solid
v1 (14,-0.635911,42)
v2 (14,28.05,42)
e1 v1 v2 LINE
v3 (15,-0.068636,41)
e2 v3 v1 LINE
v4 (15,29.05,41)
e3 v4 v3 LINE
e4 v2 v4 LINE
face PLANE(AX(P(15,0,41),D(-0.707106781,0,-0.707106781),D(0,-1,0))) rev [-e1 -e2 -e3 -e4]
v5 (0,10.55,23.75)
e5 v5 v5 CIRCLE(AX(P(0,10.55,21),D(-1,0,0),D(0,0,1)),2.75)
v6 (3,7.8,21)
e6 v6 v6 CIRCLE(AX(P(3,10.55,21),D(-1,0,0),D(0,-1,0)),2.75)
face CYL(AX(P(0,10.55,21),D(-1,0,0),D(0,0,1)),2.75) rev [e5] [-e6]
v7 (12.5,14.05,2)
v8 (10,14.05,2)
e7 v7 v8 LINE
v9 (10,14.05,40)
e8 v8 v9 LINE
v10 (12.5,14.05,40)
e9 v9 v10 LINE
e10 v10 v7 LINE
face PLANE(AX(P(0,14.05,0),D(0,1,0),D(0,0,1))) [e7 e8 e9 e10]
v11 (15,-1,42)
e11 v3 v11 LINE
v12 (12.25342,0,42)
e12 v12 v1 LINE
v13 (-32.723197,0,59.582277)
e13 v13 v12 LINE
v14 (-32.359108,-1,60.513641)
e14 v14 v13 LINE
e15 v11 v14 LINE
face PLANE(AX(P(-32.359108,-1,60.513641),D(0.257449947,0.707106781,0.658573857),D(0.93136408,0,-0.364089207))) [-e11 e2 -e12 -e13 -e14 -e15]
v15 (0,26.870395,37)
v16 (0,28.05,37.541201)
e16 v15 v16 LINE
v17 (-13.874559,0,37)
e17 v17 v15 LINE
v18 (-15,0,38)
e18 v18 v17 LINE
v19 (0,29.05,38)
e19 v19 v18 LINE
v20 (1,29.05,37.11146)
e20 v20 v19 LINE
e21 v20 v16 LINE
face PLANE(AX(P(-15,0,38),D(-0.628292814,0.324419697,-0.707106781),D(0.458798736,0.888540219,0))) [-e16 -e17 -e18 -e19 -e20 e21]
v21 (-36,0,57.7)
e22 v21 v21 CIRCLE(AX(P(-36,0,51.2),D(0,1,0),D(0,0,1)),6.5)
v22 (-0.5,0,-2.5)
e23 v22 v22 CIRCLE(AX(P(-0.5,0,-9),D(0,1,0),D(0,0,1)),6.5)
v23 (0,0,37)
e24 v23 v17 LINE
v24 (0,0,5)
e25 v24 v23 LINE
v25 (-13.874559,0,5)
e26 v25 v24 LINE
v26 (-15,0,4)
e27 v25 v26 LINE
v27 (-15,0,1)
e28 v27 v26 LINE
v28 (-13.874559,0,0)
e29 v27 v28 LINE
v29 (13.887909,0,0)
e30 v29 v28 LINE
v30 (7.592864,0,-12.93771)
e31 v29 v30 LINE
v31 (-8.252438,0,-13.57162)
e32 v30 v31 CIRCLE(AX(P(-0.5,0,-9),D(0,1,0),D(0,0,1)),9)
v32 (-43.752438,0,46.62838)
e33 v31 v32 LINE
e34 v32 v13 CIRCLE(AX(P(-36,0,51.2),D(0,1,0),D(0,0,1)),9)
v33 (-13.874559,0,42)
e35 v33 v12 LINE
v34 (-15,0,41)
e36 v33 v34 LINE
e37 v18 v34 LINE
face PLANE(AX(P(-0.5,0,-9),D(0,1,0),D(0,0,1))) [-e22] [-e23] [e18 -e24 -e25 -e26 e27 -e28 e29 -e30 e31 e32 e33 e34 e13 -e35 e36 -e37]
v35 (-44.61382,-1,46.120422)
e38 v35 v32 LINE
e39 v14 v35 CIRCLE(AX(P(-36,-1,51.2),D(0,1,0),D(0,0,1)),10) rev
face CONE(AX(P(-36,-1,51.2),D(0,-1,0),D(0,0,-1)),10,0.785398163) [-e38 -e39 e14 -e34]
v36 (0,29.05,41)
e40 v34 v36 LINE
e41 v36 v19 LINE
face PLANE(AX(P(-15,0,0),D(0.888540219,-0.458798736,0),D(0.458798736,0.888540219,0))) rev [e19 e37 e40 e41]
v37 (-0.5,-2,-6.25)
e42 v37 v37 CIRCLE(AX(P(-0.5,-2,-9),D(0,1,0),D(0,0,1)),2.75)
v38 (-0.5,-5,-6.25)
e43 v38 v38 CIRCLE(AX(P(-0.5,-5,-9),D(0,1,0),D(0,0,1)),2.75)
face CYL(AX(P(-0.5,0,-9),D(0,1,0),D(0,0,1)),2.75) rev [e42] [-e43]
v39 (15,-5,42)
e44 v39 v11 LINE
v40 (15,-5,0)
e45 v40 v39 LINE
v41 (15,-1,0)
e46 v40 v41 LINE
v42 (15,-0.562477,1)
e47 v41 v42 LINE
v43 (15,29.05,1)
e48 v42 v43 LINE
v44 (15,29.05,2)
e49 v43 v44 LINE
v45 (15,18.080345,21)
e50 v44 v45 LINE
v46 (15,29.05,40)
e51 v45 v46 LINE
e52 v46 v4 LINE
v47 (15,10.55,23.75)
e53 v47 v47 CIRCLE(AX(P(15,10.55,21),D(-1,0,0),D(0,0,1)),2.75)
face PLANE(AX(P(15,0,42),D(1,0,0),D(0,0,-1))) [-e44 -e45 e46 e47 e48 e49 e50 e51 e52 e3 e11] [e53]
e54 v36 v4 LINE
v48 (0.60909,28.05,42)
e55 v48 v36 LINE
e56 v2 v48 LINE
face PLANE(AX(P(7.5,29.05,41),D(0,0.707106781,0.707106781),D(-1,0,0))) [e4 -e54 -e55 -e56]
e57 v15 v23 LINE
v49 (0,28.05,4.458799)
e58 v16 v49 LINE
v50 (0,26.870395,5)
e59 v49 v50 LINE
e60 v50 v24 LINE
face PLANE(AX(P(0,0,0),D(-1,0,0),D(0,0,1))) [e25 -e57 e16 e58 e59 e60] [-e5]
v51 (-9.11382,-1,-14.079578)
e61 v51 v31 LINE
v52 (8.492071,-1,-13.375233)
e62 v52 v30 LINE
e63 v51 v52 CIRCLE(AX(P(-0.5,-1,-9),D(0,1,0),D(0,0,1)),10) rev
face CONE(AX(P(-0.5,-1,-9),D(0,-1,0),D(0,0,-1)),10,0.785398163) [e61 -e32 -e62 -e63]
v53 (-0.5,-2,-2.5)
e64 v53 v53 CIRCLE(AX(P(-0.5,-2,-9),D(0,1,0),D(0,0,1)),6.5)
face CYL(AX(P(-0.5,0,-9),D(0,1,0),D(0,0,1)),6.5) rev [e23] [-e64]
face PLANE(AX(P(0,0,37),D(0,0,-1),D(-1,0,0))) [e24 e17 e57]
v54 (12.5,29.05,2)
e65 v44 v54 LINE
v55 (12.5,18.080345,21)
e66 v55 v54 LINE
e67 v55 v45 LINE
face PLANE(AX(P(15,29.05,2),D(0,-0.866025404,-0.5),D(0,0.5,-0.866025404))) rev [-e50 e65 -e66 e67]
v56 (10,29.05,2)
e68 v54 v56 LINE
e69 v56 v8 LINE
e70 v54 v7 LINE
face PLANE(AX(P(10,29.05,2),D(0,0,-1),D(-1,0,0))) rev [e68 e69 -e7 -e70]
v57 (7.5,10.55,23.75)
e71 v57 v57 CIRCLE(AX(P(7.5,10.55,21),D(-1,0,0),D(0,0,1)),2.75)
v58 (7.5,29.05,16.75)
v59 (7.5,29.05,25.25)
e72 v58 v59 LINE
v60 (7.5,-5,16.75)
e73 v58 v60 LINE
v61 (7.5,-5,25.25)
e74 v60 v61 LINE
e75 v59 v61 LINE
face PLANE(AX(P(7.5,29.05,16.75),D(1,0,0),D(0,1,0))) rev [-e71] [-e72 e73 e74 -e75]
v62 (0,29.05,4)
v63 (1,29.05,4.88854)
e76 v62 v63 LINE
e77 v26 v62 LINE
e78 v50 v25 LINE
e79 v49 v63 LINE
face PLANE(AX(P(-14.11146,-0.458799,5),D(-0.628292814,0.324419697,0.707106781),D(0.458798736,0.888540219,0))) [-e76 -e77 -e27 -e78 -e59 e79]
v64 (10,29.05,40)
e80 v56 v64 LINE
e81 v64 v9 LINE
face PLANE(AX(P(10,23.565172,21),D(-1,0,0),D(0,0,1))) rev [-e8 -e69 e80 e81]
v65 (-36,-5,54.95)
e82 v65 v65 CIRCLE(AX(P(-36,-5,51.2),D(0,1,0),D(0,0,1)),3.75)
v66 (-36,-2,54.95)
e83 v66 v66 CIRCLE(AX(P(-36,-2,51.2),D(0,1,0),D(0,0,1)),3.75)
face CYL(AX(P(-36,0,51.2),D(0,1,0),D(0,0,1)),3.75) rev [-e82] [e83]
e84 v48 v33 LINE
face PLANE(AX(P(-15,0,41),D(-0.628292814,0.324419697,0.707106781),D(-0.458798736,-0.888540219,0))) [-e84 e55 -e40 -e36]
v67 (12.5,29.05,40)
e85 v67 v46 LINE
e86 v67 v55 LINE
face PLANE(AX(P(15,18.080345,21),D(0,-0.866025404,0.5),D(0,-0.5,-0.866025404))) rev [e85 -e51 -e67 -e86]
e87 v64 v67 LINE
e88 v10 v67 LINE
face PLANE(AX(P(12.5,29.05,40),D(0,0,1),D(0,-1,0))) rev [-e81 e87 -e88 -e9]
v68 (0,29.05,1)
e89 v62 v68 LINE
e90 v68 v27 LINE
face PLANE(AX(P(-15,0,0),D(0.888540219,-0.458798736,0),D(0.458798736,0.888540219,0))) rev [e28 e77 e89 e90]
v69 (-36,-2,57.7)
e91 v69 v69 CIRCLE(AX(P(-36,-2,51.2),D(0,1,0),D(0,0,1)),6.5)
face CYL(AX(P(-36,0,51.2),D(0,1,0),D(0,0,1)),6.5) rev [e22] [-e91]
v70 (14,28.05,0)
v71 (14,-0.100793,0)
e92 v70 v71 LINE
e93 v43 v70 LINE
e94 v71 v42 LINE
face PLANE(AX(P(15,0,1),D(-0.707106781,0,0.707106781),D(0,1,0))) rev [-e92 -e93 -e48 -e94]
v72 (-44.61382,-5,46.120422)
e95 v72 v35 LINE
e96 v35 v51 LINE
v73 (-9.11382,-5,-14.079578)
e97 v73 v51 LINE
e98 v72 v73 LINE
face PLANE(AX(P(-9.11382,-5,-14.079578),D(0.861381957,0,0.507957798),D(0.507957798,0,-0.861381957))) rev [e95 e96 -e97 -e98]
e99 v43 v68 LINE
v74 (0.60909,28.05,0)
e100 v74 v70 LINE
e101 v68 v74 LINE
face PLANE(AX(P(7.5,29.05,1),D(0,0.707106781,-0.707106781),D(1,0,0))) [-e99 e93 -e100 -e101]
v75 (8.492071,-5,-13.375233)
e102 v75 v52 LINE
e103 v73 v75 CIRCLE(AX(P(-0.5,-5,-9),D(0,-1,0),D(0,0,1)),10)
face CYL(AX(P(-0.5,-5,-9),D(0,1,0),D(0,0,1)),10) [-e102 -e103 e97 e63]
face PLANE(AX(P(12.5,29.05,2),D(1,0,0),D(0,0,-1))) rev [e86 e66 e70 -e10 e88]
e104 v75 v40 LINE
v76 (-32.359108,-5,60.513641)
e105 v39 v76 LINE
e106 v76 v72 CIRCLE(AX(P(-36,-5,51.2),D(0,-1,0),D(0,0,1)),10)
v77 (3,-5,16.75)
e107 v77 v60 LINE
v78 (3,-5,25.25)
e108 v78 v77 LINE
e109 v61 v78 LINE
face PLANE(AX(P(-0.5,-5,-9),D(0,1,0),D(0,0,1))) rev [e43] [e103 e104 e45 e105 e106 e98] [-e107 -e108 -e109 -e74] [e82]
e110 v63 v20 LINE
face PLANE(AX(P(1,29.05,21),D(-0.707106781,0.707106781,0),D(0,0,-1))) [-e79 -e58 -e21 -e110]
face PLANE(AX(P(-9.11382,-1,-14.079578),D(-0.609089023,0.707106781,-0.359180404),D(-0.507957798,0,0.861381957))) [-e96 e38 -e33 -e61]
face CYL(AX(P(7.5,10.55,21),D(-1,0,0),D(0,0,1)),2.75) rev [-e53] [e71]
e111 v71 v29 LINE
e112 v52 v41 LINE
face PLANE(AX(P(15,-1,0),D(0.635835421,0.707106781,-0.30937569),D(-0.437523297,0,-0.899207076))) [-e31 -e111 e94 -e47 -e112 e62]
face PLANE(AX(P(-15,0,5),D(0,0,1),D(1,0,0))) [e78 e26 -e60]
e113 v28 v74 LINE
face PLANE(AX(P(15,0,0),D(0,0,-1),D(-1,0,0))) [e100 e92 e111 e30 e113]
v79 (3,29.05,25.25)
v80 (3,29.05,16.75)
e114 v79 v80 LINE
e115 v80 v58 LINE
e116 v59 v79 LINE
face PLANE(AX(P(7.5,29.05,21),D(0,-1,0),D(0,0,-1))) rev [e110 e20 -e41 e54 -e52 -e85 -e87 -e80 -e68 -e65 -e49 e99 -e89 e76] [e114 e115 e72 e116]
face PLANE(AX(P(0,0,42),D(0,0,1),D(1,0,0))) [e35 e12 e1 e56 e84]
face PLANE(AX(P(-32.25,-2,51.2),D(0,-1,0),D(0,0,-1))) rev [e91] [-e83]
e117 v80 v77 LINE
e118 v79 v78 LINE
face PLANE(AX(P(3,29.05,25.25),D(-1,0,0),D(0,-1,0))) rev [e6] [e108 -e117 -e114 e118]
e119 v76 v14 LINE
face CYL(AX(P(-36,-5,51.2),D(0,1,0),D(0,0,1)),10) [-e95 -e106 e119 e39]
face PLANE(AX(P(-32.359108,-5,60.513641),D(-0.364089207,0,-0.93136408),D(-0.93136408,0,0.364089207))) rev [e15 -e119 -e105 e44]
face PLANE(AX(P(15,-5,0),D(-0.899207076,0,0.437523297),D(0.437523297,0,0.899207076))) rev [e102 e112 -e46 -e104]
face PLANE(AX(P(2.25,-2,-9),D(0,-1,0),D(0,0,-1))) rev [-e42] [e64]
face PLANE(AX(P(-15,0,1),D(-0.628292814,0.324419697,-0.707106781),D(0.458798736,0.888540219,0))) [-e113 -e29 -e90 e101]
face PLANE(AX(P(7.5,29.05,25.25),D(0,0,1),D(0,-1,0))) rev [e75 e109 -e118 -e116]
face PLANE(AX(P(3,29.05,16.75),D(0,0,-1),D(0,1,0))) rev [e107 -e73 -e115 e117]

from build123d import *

# Parameters (mm, degrees)
CUT_EXTRUDE1_OUTLINE_W                  = 29.05
CUT_EXTRUDE1_OUTLINE_H                  = 42
CUT_EXTRUDE1_DEPTH                      = 10
CUT_EXTRUDE1_START                      = 10
CUT_EXTRUDE1_2_DEPTH                    = 5
CUT_EXTRUDE1_START_2                    = 12.5
CUT_EXTRUDE1_3_DEPTH                    = 2.5
CUT_EXTRUDE1_4_DEPTH                    = 5
CUT_EXTRUDE1_START_3                    = 37
CUT_EXTRUDE1_5_DEPTH                    = 5
BOSS_EXTRUDE1_DEPTH                     = 5
SKETCH3_W                               = 4.5
SKETCH3_H                               = 8.5
CUT_EXTRUDE2_DEPTH                      = 84.790467835
CBORE_FOR_M5_HEX_HEAD_BOLT1_D           = 5.5
CBORE_FOR_M5_HEX_HEAD_BOLT1_CBORE_D     = 13
CBORE_FOR_M5_HEX_HEAD_BOLT1_CBORE_DEPTH = 2
CBORE_FOR_M6_5_SHSS1_D                  = 7.5
CBORE_FOR_M6_5_SHSS1_CBORE_D            = 13
CBORE_FOR_M6_5_SHSS1_CBORE_DEPTH        = 2
SKETCH8_W                               = 2.75
SKETCH8_H                               = 7.5
F_5_5_5_5_DIAMETER_HOLE2_D              = 5.5
F_5_5_5_5_DIAMETER_HOLE2_DEPTH          = 15
CHAMFER2_SIZE                           = 1
CHAMFER3_SIZE                           = 1
CHAMFER4_SIZE                           = 1


with BuildPart() as part:
    # Cut-Extrude1: read off the stored shape, not the designer's step
    # Cut-Extrude1 outline → Cut-Extrude1 (new body)
    with BuildSketch(Plane.YZ):
        with Locations((14.525, 21)):
            Rectangle(CUT_EXTRUDE1_OUTLINE_W, CUT_EXTRUDE1_OUTLINE_H)
    extrude(amount=CUT_EXTRUDE1_DEPTH)

    # Cut-Extrude1 2 outline → Cut-Extrude1 2 (add)
    with BuildSketch(Plane.YZ.offset(CUT_EXTRUDE1_START)):
        Polygon((29.05, 2), (14.05, 2), (14.05, 40), (29.05, 40), (29.05, 42), (0, 42), (0, 0), (29.05, 0), align=None)
    extrude(amount=CUT_EXTRUDE1_2_DEPTH)

    # Cut-Extrude1 3 outline → Cut-Extrude1 3 (add)
    with BuildSketch(Plane.YZ.offset(CUT_EXTRUDE1_START_2)):
        Polygon((14.05, 2), (29.05, 2), (18.080344885, 21), (29.05, 40), (14.05, 40), align=None)
    extrude(amount=CUT_EXTRUDE1_3_DEPTH)

    # Cut-Extrude1 4 outline → Cut-Extrude1 4 (add)
    with BuildSketch(Plane.XY):
        Polygon((0, 29.05), (-15, 0), (0, 0), align=None)
    extrude(amount=CUT_EXTRUDE1_4_DEPTH)

    # Cut-Extrude1 5 outline → Cut-Extrude1 5 (add)
    with BuildSketch(Plane.XY.offset(CUT_EXTRUDE1_START_3)):
        Polygon((0, 29.05), (-15, 0), (0, 0), align=None)
    extrude(amount=CUT_EXTRUDE1_5_DEPTH)

    # Sketch2 → Boss-Extrude1 (add)
    with BuildSketch(Plane.XZ):
        with BuildLine():
            Line((-9.113819566, -14.079577983), (-44.613819566, 46.120422017))
            ThreePointArc((-44.613819566, 46.120422017), (-43.61404549, 57.68277034), (-32.359107934, 60.513640801))
            Line((-32.359107934, 60.513640801), (15, 42))
            Line((15, 42), (15, 0))
            Line((15, 0), (8.492070756, -13.375232968))
            ThreePointArc((8.492070756, -13.375232968), (-0.100257626, -18.992007107), (-9.113819566, -14.079577983))
        make_face()
    extrude(amount=BOSS_EXTRUDE1_DEPTH)

    # Sketch3 → Cut-Extrude2 (cut, through all)
    with BuildSketch(Plane.XZ.offset(5)):
        with Locations((5.25, 21)):
            Rectangle(SKETCH3_W, SKETCH3_H)
    extrude(amount=-CUT_EXTRUDE2_DEPTH, mode=Mode.SUBTRACT)

    # CBORE for M5 Hex Head Bolt1 (through all)
    with Locations(Plane(origin=(0, 0, 0), x_dir=(1, 0, 0), z_dir=(0, 1, 0))):
        with Locations((-0.5, 9)):
            CounterBoreHole(CBORE_FOR_M5_HEX_HEAD_BOLT1_D / 2, CBORE_FOR_M5_HEX_HEAD_BOLT1_CBORE_D / 2, CBORE_FOR_M5_HEX_HEAD_BOLT1_CBORE_DEPTH)

    # CBORE for M6.5 SHSS1 (through all)
    with Locations(Plane(origin=(0, 0, 0), x_dir=(1, 0, 0), z_dir=(0, 1, 0))):
        with Locations((-36, -51.2)):
            CounterBoreHole(CBORE_FOR_M6_5_SHSS1_D / 2, CBORE_FOR_M6_5_SHSS1_CBORE_D / 2, CBORE_FOR_M6_5_SHSS1_CBORE_DEPTH)

    # Sketch8 → Ø5.5 (5.5) Diameter Hole1 (revolve, cut)
    with BuildSketch(Plane(origin=(7.5, 10.55, 21), x_dir=(0, 0, 1), z_dir=(0, 1, 0))):
        with Locations((1.375, 3.75)):
            Rectangle(SKETCH8_W, SKETCH8_H)
    revolve(axis=Axis((1.15, 10.55, 21), (1, 0, 0)), mode=Mode.SUBTRACT)

    # Ø5.5 (5.5) Diameter Hole2
    with Locations(Plane.ZY):
        with Locations((21, 10.55)):
            Hole(F_5_5_5_5_DIAMETER_HOLE2_D / 2, depth=F_5_5_5_5_DIAMETER_HOLE2_DEPTH)

    # Chamfer2
    chamfer2_edges = [part.edges().sort_by_distance(p)[0] for p in [
        (-7.5, 14.525, 42),
        (7.5, 29.05, 42),
        (-7.5, 14.525, 5),
        (7.5, 29.05, 0),
        (-7.5, 14.525, 0),
        (-7.5, 14.525, 37),
        (-0.100257626, 0, -18.992007107),
        (11.746035378, 0, -6.687616484),
        (-8.679553967, 0, 51.2568204),
        (-43.61404549, 0, 57.68277034),
        (-26.863819566, 0, 16.020422017),
    ]]
    chamfer(chamfer2_edges, length=CHAMFER2_SIZE)

    # Chamfer3
    chamfer3_edges = [part.edges().sort_by_distance(p)[0] for p in [
        (0, 29.05, 21),
    ]]
    chamfer(chamfer3_edges, length=CHAMFER3_SIZE)

    # Chamfer4
    chamfer4_edges = [part.edges().sort_by_distance(p)[0] for p in [
        (15, 13.525, 0),
        (15, 13.525, 42),
    ]]
    chamfer(chamfer4_edges, length=CHAMFER4_SIZE)


solid = part.part
